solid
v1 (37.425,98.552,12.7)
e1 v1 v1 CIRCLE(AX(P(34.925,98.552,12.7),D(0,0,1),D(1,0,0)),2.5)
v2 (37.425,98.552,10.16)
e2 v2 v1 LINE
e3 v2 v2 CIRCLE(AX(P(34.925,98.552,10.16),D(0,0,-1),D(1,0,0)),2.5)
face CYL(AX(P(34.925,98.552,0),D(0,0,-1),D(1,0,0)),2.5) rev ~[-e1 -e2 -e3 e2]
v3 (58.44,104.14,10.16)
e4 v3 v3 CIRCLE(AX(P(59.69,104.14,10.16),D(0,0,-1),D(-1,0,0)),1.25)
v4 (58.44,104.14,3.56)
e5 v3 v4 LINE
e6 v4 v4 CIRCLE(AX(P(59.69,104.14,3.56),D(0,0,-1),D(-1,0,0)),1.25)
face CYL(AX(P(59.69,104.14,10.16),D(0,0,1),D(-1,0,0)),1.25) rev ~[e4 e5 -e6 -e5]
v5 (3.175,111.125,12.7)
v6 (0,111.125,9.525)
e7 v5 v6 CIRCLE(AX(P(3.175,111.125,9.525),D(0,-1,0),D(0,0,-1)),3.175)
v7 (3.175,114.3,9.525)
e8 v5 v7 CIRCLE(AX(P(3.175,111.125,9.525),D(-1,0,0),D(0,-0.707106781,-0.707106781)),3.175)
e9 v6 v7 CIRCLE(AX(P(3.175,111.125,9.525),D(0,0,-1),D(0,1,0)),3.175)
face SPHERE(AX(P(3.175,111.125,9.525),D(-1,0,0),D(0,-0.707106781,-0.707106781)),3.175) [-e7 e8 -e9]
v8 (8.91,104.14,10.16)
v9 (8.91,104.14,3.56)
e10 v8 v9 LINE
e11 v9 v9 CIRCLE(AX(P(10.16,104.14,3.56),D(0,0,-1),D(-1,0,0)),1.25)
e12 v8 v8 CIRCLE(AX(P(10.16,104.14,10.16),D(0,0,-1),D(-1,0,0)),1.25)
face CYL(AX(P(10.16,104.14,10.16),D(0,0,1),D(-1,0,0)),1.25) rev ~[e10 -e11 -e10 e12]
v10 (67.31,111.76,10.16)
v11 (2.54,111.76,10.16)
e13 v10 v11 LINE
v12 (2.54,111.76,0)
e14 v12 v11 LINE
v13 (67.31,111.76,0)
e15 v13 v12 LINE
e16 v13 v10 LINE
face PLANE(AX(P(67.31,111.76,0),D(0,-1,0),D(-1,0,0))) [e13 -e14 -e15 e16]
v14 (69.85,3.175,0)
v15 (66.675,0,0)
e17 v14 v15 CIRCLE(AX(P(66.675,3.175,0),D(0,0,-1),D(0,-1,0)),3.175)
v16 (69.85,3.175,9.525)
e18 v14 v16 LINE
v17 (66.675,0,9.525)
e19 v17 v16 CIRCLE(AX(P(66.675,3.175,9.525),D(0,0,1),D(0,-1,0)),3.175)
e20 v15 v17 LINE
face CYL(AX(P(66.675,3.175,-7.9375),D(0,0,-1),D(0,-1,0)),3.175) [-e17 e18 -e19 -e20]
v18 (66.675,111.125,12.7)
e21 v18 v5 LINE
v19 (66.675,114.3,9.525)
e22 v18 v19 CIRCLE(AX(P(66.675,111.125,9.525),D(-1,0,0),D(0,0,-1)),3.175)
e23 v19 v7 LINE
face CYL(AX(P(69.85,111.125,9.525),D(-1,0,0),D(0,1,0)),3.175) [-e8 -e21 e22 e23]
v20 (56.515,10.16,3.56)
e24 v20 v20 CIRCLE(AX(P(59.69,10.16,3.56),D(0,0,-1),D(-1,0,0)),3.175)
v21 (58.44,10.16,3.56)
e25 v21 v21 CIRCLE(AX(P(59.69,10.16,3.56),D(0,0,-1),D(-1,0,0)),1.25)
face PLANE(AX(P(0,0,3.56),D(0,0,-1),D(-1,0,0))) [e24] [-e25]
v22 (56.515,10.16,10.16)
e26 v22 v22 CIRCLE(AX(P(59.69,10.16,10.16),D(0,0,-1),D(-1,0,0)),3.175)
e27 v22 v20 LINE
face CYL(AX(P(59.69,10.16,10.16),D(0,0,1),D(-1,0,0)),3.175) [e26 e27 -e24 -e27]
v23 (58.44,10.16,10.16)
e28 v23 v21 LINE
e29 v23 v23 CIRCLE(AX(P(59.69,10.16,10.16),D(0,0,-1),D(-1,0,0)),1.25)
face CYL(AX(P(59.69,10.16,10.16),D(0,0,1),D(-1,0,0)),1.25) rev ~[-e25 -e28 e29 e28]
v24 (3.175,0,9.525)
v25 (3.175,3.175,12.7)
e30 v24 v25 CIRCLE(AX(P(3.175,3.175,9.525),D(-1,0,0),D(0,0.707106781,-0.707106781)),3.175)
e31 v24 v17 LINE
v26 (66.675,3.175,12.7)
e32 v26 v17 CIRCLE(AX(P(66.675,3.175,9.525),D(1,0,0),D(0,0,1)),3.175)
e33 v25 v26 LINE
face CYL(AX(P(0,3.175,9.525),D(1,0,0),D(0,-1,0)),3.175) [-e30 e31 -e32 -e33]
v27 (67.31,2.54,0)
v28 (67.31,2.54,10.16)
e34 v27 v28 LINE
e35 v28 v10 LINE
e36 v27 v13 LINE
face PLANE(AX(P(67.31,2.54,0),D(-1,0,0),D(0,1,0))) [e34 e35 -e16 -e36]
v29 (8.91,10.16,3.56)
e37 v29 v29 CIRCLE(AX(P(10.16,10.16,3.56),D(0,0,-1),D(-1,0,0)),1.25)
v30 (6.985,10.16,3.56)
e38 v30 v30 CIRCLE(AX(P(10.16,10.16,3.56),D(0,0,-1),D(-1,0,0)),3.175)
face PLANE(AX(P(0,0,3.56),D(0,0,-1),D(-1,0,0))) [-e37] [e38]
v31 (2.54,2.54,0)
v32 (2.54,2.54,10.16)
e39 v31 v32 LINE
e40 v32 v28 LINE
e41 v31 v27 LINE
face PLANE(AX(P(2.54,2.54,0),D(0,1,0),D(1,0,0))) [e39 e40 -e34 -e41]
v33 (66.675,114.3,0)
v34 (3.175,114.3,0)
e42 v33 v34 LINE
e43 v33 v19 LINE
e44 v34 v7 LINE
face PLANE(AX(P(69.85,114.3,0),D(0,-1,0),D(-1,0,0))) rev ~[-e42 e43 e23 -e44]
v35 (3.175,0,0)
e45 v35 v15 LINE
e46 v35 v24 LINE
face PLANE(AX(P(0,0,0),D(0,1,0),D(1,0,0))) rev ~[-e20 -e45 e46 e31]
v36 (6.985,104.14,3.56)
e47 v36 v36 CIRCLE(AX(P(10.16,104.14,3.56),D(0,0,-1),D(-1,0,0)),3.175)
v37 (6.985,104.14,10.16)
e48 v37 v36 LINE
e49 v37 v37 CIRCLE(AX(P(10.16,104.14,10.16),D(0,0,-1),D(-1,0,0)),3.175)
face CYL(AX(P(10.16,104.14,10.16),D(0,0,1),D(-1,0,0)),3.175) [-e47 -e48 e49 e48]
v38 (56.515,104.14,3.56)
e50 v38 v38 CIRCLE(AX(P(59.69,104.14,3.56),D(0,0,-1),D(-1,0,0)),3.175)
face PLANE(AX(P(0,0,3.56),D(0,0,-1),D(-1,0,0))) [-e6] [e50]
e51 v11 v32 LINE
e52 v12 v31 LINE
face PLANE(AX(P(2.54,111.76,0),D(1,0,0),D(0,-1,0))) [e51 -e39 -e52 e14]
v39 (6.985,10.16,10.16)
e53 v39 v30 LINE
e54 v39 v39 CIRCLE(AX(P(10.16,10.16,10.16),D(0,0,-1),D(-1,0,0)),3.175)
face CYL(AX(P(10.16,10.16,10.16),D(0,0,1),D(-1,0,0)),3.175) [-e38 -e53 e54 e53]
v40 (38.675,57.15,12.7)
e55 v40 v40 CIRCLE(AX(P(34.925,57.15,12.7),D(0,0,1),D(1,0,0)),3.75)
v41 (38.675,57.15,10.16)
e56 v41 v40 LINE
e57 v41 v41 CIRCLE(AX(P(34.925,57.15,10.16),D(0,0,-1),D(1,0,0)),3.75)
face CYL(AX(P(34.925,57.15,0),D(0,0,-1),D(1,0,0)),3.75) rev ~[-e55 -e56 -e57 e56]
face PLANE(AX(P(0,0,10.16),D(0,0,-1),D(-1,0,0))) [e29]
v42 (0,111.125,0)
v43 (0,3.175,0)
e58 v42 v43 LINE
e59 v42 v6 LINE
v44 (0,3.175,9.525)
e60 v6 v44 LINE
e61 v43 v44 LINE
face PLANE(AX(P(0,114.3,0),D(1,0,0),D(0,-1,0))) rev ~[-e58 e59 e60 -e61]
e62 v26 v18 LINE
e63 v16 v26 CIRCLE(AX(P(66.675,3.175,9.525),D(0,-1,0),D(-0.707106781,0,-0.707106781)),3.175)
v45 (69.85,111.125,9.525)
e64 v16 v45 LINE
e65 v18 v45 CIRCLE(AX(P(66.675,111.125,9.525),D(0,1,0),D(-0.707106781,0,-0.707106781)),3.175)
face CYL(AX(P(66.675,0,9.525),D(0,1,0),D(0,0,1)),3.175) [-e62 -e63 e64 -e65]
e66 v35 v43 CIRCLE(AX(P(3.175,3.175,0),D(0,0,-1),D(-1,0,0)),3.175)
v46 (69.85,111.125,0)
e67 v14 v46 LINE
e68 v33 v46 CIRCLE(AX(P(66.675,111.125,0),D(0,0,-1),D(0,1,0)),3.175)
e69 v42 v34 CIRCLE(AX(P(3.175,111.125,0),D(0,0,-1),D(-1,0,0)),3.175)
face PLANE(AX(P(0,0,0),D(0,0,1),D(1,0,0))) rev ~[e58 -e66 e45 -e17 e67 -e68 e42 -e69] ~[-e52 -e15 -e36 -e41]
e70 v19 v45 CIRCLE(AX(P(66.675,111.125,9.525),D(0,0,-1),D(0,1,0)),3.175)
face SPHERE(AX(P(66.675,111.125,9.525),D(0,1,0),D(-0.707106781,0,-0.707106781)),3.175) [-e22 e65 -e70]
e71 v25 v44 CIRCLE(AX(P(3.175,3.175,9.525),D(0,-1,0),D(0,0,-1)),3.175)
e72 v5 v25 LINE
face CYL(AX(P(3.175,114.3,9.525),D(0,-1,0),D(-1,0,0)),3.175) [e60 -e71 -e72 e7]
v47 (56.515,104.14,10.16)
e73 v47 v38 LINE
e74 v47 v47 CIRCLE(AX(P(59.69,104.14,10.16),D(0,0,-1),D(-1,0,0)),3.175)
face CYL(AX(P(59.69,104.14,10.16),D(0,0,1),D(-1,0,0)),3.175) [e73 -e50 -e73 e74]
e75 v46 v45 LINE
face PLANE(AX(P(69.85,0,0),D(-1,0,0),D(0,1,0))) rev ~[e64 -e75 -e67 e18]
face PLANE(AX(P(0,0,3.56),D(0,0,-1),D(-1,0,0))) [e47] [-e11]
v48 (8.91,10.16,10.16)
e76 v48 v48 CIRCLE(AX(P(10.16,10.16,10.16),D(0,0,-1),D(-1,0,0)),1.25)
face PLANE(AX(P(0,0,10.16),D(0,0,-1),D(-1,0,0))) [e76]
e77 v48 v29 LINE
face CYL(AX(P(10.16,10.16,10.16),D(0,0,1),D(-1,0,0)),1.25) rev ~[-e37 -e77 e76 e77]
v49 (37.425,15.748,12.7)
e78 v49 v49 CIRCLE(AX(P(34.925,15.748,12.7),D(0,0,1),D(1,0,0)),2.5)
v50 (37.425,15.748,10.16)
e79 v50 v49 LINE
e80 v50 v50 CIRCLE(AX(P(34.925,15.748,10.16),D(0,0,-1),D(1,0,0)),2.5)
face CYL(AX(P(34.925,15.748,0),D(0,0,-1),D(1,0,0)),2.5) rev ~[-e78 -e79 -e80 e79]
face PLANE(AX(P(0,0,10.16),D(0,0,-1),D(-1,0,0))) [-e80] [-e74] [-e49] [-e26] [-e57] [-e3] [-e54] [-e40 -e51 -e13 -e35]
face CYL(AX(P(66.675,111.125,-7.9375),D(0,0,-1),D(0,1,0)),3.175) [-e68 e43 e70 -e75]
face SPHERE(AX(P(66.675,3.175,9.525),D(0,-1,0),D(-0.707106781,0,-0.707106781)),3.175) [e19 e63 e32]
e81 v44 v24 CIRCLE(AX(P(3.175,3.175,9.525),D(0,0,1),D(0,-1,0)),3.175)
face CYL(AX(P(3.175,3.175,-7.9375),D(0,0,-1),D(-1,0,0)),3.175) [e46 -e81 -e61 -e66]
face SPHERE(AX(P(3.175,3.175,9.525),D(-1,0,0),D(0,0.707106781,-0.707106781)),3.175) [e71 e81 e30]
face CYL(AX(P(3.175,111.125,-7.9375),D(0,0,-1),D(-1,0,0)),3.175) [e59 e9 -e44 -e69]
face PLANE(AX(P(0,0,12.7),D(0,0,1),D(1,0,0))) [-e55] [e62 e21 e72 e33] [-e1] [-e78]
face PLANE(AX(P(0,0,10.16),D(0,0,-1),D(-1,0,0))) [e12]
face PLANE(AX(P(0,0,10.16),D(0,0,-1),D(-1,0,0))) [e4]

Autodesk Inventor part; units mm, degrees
ref_plane "YZ Plane" through (0, 0, 0) normal (1, 0, 0) x (0, 1, 0)
ref_plane "XZ Plane" through (0, 0, 0) normal (0, 1, 0) x (-1, 0, 0)
ref_plane "XY Plane" through (0, 0, 0) normal (0, 0, 1) x (1, 0, 0)
sketch "Sketch1" plane through (0, 0, 0) normal (0, 0, 1) x (1, 0, 0)
  line L0 (0, 0) -> (69.85, 0)
  line L1 (69.85, 0) -> (69.85, 114.3)
  line L2 (69.85, 114.3) -> (0, 114.3)
  line L3 (0, 114.3) -> (0, 0)
  circle A0 centre (34.925, 98.552) radius 2.5
  circle A1 centre (34.925, 15.748) radius 2.5
  circle A2 centre (34.925, 57.15) radius 3.75
  point P0 (34.925, 114.3)
  point P1 (0, 57.15)
  dimension "d0" = 69.85
  dimension "d1" = 114.3
  dimension "d13" = 82.804
  dimension "d14" = 5
  dimension "d15" = 5
  dimension "d16" = 7.5
  dimension "d17" = 15.748
extrude "Extrusion2" add sketch "Sketch1" along normal blind 12.7
sketch "Sketch3" plane through (0, 0, 0) normal (0, 0, -1) x (-1, 0, 0)
  line L0 (-67.31, 111.76) -> (-2.54, 111.76)
  line L1 (-2.54, 111.76) -> (-2.54, 2.54)
  line L2 (-2.54, 2.54) -> (-67.31, 2.54)
  line L3 (-67.31, 2.54) -> (-67.31, 111.76)
  circle A0 centre (-34.925, 57.15) radius 3.75 projected
  circle A1 centre (-34.925, 15.748) radius 2.5 projected
  circle A2 centre (-34.925, 98.552) radius 2.5 projected
  line L4 (0, 0) -> (-69.85, 0) projected
  line L5 (0, 114.3) -> (0, 0) projected
  line L6 (-69.85, 114.3) -> (0, 114.3) projected
  line L7 (-69.85, 0) -> (-69.85, 114.3) projected
  dimension "d20" = 114.3
  dimension "d21" = 69.85
  dimension "d22" = 2.54
  dimension "d24" = 2.54
  dimension "d25" = 2.54
  dimension "d26" = 2.54
extrude "Extrusion3" cut sketch "Sketch3" against normal blind 10.16 contours L0 L1 L2 L3
sketch "Sketch4" plane through (0, 0, 10.16) normal (0, 0, -1) x (-1, 0, 0)
  circle A0 centre (-34.925, 57.15) radius 3.75 projected
  circle A1 centre (-34.925, 98.552) radius 2.5 projected
  circle A2 centre (-34.925, 15.748) radius 2.5 projected
  line L0 (-67.31, 111.76) -> (-2.54, 111.76) projected
  line L1 (-67.31, 2.54) -> (-67.31, 111.76) projected
  line L2 (-2.54, 2.54) -> (-67.31, 2.54) projected
  line L3 (-2.54, 111.76) -> (-2.54, 2.54) projected
  circle A3 centre (-59.69, 104.14) radius 3.175
  circle A4 centre (-59.69, 104.14) radius 1.25
  circle A5 centre (-10.16, 104.14) radius 3.175
  circle A6 centre (-10.16, 104.14) radius 1.25
  circle A7 centre (-59.69, 10.16) radius 3.175
  circle A8 centre (-59.69, 10.16) radius 1.25
  circle A9 centre (-10.16, 10.16) radius 3.175
  circle A10 centre (-10.16, 10.16) radius 1.25
  point P0 (0, 0)
  dimension "d29" = 6.35
  dimension "d30" = 2.5
  dimension "d31" = 6.35
  dimension "d32" = 2.5
  dimension "d33" = 7.62
  dimension "d34" = 7.62
  dimension "d35" = 7.62
  dimension "d36" = 7.62
  dimension "d37" = 6.35
  dimension "d38" = 2.5
  dimension "d39" = 7.62
  dimension "d40" = 7.62
  dimension "d41" = 6.35
  dimension "d42" = 2.5
  dimension "d43" = 7.62
  dimension "d44" = 7.62
extrude "Extrusion4" add sketch "Sketch4" along normal blind 6.6 contours A3 | A5 | A7 | A9
fillet "Fillet1" radius 3.175 4 edges at (0, 57.15, 12.7) (69.85, 57.15, 12.7) (34.925, 114.3, 12.7) (34.925, 0, 12.7)
fillet "Fillet2" radius 3.175 8 edges at (0.9299, 113.3701, 11.7701) (0, 114.3, 4.7625) (68.9201, 113.3701, 11.7701) (69.85, 114.3, 4.7625) (0.9299, 0.9299, 11.7701) (0, 0, 4.7625) (68.9201, 0.9299, 11.7701) (69.85, 0, 4.7625)
equation "\"d17\" = -0.5 * d13 + 0.5 * d1"
equation "\"d24\" = d22"
equation "\"d25\" = d22"
equation "\"d26\" = d22"
equation "\"d31\" = d29"
equation "\"d32\" = d30"
equation "\"d34\" = d33"
equation "\"d35\" = d33"
equation "\"d36\" = d33"
equation "\"d37\" = d29"
equation "\"d38\" = d30"
equation "\"d39\" = d33"
equation "\"d40\" = d33"
equation "\"d41\" = d29"
equation "\"d42\" = d30"
equation "\"d43\" = d33"
equation "\"d44\" = d33"
properties part number "LightSwitchCover" material "Nylon 6/6"
